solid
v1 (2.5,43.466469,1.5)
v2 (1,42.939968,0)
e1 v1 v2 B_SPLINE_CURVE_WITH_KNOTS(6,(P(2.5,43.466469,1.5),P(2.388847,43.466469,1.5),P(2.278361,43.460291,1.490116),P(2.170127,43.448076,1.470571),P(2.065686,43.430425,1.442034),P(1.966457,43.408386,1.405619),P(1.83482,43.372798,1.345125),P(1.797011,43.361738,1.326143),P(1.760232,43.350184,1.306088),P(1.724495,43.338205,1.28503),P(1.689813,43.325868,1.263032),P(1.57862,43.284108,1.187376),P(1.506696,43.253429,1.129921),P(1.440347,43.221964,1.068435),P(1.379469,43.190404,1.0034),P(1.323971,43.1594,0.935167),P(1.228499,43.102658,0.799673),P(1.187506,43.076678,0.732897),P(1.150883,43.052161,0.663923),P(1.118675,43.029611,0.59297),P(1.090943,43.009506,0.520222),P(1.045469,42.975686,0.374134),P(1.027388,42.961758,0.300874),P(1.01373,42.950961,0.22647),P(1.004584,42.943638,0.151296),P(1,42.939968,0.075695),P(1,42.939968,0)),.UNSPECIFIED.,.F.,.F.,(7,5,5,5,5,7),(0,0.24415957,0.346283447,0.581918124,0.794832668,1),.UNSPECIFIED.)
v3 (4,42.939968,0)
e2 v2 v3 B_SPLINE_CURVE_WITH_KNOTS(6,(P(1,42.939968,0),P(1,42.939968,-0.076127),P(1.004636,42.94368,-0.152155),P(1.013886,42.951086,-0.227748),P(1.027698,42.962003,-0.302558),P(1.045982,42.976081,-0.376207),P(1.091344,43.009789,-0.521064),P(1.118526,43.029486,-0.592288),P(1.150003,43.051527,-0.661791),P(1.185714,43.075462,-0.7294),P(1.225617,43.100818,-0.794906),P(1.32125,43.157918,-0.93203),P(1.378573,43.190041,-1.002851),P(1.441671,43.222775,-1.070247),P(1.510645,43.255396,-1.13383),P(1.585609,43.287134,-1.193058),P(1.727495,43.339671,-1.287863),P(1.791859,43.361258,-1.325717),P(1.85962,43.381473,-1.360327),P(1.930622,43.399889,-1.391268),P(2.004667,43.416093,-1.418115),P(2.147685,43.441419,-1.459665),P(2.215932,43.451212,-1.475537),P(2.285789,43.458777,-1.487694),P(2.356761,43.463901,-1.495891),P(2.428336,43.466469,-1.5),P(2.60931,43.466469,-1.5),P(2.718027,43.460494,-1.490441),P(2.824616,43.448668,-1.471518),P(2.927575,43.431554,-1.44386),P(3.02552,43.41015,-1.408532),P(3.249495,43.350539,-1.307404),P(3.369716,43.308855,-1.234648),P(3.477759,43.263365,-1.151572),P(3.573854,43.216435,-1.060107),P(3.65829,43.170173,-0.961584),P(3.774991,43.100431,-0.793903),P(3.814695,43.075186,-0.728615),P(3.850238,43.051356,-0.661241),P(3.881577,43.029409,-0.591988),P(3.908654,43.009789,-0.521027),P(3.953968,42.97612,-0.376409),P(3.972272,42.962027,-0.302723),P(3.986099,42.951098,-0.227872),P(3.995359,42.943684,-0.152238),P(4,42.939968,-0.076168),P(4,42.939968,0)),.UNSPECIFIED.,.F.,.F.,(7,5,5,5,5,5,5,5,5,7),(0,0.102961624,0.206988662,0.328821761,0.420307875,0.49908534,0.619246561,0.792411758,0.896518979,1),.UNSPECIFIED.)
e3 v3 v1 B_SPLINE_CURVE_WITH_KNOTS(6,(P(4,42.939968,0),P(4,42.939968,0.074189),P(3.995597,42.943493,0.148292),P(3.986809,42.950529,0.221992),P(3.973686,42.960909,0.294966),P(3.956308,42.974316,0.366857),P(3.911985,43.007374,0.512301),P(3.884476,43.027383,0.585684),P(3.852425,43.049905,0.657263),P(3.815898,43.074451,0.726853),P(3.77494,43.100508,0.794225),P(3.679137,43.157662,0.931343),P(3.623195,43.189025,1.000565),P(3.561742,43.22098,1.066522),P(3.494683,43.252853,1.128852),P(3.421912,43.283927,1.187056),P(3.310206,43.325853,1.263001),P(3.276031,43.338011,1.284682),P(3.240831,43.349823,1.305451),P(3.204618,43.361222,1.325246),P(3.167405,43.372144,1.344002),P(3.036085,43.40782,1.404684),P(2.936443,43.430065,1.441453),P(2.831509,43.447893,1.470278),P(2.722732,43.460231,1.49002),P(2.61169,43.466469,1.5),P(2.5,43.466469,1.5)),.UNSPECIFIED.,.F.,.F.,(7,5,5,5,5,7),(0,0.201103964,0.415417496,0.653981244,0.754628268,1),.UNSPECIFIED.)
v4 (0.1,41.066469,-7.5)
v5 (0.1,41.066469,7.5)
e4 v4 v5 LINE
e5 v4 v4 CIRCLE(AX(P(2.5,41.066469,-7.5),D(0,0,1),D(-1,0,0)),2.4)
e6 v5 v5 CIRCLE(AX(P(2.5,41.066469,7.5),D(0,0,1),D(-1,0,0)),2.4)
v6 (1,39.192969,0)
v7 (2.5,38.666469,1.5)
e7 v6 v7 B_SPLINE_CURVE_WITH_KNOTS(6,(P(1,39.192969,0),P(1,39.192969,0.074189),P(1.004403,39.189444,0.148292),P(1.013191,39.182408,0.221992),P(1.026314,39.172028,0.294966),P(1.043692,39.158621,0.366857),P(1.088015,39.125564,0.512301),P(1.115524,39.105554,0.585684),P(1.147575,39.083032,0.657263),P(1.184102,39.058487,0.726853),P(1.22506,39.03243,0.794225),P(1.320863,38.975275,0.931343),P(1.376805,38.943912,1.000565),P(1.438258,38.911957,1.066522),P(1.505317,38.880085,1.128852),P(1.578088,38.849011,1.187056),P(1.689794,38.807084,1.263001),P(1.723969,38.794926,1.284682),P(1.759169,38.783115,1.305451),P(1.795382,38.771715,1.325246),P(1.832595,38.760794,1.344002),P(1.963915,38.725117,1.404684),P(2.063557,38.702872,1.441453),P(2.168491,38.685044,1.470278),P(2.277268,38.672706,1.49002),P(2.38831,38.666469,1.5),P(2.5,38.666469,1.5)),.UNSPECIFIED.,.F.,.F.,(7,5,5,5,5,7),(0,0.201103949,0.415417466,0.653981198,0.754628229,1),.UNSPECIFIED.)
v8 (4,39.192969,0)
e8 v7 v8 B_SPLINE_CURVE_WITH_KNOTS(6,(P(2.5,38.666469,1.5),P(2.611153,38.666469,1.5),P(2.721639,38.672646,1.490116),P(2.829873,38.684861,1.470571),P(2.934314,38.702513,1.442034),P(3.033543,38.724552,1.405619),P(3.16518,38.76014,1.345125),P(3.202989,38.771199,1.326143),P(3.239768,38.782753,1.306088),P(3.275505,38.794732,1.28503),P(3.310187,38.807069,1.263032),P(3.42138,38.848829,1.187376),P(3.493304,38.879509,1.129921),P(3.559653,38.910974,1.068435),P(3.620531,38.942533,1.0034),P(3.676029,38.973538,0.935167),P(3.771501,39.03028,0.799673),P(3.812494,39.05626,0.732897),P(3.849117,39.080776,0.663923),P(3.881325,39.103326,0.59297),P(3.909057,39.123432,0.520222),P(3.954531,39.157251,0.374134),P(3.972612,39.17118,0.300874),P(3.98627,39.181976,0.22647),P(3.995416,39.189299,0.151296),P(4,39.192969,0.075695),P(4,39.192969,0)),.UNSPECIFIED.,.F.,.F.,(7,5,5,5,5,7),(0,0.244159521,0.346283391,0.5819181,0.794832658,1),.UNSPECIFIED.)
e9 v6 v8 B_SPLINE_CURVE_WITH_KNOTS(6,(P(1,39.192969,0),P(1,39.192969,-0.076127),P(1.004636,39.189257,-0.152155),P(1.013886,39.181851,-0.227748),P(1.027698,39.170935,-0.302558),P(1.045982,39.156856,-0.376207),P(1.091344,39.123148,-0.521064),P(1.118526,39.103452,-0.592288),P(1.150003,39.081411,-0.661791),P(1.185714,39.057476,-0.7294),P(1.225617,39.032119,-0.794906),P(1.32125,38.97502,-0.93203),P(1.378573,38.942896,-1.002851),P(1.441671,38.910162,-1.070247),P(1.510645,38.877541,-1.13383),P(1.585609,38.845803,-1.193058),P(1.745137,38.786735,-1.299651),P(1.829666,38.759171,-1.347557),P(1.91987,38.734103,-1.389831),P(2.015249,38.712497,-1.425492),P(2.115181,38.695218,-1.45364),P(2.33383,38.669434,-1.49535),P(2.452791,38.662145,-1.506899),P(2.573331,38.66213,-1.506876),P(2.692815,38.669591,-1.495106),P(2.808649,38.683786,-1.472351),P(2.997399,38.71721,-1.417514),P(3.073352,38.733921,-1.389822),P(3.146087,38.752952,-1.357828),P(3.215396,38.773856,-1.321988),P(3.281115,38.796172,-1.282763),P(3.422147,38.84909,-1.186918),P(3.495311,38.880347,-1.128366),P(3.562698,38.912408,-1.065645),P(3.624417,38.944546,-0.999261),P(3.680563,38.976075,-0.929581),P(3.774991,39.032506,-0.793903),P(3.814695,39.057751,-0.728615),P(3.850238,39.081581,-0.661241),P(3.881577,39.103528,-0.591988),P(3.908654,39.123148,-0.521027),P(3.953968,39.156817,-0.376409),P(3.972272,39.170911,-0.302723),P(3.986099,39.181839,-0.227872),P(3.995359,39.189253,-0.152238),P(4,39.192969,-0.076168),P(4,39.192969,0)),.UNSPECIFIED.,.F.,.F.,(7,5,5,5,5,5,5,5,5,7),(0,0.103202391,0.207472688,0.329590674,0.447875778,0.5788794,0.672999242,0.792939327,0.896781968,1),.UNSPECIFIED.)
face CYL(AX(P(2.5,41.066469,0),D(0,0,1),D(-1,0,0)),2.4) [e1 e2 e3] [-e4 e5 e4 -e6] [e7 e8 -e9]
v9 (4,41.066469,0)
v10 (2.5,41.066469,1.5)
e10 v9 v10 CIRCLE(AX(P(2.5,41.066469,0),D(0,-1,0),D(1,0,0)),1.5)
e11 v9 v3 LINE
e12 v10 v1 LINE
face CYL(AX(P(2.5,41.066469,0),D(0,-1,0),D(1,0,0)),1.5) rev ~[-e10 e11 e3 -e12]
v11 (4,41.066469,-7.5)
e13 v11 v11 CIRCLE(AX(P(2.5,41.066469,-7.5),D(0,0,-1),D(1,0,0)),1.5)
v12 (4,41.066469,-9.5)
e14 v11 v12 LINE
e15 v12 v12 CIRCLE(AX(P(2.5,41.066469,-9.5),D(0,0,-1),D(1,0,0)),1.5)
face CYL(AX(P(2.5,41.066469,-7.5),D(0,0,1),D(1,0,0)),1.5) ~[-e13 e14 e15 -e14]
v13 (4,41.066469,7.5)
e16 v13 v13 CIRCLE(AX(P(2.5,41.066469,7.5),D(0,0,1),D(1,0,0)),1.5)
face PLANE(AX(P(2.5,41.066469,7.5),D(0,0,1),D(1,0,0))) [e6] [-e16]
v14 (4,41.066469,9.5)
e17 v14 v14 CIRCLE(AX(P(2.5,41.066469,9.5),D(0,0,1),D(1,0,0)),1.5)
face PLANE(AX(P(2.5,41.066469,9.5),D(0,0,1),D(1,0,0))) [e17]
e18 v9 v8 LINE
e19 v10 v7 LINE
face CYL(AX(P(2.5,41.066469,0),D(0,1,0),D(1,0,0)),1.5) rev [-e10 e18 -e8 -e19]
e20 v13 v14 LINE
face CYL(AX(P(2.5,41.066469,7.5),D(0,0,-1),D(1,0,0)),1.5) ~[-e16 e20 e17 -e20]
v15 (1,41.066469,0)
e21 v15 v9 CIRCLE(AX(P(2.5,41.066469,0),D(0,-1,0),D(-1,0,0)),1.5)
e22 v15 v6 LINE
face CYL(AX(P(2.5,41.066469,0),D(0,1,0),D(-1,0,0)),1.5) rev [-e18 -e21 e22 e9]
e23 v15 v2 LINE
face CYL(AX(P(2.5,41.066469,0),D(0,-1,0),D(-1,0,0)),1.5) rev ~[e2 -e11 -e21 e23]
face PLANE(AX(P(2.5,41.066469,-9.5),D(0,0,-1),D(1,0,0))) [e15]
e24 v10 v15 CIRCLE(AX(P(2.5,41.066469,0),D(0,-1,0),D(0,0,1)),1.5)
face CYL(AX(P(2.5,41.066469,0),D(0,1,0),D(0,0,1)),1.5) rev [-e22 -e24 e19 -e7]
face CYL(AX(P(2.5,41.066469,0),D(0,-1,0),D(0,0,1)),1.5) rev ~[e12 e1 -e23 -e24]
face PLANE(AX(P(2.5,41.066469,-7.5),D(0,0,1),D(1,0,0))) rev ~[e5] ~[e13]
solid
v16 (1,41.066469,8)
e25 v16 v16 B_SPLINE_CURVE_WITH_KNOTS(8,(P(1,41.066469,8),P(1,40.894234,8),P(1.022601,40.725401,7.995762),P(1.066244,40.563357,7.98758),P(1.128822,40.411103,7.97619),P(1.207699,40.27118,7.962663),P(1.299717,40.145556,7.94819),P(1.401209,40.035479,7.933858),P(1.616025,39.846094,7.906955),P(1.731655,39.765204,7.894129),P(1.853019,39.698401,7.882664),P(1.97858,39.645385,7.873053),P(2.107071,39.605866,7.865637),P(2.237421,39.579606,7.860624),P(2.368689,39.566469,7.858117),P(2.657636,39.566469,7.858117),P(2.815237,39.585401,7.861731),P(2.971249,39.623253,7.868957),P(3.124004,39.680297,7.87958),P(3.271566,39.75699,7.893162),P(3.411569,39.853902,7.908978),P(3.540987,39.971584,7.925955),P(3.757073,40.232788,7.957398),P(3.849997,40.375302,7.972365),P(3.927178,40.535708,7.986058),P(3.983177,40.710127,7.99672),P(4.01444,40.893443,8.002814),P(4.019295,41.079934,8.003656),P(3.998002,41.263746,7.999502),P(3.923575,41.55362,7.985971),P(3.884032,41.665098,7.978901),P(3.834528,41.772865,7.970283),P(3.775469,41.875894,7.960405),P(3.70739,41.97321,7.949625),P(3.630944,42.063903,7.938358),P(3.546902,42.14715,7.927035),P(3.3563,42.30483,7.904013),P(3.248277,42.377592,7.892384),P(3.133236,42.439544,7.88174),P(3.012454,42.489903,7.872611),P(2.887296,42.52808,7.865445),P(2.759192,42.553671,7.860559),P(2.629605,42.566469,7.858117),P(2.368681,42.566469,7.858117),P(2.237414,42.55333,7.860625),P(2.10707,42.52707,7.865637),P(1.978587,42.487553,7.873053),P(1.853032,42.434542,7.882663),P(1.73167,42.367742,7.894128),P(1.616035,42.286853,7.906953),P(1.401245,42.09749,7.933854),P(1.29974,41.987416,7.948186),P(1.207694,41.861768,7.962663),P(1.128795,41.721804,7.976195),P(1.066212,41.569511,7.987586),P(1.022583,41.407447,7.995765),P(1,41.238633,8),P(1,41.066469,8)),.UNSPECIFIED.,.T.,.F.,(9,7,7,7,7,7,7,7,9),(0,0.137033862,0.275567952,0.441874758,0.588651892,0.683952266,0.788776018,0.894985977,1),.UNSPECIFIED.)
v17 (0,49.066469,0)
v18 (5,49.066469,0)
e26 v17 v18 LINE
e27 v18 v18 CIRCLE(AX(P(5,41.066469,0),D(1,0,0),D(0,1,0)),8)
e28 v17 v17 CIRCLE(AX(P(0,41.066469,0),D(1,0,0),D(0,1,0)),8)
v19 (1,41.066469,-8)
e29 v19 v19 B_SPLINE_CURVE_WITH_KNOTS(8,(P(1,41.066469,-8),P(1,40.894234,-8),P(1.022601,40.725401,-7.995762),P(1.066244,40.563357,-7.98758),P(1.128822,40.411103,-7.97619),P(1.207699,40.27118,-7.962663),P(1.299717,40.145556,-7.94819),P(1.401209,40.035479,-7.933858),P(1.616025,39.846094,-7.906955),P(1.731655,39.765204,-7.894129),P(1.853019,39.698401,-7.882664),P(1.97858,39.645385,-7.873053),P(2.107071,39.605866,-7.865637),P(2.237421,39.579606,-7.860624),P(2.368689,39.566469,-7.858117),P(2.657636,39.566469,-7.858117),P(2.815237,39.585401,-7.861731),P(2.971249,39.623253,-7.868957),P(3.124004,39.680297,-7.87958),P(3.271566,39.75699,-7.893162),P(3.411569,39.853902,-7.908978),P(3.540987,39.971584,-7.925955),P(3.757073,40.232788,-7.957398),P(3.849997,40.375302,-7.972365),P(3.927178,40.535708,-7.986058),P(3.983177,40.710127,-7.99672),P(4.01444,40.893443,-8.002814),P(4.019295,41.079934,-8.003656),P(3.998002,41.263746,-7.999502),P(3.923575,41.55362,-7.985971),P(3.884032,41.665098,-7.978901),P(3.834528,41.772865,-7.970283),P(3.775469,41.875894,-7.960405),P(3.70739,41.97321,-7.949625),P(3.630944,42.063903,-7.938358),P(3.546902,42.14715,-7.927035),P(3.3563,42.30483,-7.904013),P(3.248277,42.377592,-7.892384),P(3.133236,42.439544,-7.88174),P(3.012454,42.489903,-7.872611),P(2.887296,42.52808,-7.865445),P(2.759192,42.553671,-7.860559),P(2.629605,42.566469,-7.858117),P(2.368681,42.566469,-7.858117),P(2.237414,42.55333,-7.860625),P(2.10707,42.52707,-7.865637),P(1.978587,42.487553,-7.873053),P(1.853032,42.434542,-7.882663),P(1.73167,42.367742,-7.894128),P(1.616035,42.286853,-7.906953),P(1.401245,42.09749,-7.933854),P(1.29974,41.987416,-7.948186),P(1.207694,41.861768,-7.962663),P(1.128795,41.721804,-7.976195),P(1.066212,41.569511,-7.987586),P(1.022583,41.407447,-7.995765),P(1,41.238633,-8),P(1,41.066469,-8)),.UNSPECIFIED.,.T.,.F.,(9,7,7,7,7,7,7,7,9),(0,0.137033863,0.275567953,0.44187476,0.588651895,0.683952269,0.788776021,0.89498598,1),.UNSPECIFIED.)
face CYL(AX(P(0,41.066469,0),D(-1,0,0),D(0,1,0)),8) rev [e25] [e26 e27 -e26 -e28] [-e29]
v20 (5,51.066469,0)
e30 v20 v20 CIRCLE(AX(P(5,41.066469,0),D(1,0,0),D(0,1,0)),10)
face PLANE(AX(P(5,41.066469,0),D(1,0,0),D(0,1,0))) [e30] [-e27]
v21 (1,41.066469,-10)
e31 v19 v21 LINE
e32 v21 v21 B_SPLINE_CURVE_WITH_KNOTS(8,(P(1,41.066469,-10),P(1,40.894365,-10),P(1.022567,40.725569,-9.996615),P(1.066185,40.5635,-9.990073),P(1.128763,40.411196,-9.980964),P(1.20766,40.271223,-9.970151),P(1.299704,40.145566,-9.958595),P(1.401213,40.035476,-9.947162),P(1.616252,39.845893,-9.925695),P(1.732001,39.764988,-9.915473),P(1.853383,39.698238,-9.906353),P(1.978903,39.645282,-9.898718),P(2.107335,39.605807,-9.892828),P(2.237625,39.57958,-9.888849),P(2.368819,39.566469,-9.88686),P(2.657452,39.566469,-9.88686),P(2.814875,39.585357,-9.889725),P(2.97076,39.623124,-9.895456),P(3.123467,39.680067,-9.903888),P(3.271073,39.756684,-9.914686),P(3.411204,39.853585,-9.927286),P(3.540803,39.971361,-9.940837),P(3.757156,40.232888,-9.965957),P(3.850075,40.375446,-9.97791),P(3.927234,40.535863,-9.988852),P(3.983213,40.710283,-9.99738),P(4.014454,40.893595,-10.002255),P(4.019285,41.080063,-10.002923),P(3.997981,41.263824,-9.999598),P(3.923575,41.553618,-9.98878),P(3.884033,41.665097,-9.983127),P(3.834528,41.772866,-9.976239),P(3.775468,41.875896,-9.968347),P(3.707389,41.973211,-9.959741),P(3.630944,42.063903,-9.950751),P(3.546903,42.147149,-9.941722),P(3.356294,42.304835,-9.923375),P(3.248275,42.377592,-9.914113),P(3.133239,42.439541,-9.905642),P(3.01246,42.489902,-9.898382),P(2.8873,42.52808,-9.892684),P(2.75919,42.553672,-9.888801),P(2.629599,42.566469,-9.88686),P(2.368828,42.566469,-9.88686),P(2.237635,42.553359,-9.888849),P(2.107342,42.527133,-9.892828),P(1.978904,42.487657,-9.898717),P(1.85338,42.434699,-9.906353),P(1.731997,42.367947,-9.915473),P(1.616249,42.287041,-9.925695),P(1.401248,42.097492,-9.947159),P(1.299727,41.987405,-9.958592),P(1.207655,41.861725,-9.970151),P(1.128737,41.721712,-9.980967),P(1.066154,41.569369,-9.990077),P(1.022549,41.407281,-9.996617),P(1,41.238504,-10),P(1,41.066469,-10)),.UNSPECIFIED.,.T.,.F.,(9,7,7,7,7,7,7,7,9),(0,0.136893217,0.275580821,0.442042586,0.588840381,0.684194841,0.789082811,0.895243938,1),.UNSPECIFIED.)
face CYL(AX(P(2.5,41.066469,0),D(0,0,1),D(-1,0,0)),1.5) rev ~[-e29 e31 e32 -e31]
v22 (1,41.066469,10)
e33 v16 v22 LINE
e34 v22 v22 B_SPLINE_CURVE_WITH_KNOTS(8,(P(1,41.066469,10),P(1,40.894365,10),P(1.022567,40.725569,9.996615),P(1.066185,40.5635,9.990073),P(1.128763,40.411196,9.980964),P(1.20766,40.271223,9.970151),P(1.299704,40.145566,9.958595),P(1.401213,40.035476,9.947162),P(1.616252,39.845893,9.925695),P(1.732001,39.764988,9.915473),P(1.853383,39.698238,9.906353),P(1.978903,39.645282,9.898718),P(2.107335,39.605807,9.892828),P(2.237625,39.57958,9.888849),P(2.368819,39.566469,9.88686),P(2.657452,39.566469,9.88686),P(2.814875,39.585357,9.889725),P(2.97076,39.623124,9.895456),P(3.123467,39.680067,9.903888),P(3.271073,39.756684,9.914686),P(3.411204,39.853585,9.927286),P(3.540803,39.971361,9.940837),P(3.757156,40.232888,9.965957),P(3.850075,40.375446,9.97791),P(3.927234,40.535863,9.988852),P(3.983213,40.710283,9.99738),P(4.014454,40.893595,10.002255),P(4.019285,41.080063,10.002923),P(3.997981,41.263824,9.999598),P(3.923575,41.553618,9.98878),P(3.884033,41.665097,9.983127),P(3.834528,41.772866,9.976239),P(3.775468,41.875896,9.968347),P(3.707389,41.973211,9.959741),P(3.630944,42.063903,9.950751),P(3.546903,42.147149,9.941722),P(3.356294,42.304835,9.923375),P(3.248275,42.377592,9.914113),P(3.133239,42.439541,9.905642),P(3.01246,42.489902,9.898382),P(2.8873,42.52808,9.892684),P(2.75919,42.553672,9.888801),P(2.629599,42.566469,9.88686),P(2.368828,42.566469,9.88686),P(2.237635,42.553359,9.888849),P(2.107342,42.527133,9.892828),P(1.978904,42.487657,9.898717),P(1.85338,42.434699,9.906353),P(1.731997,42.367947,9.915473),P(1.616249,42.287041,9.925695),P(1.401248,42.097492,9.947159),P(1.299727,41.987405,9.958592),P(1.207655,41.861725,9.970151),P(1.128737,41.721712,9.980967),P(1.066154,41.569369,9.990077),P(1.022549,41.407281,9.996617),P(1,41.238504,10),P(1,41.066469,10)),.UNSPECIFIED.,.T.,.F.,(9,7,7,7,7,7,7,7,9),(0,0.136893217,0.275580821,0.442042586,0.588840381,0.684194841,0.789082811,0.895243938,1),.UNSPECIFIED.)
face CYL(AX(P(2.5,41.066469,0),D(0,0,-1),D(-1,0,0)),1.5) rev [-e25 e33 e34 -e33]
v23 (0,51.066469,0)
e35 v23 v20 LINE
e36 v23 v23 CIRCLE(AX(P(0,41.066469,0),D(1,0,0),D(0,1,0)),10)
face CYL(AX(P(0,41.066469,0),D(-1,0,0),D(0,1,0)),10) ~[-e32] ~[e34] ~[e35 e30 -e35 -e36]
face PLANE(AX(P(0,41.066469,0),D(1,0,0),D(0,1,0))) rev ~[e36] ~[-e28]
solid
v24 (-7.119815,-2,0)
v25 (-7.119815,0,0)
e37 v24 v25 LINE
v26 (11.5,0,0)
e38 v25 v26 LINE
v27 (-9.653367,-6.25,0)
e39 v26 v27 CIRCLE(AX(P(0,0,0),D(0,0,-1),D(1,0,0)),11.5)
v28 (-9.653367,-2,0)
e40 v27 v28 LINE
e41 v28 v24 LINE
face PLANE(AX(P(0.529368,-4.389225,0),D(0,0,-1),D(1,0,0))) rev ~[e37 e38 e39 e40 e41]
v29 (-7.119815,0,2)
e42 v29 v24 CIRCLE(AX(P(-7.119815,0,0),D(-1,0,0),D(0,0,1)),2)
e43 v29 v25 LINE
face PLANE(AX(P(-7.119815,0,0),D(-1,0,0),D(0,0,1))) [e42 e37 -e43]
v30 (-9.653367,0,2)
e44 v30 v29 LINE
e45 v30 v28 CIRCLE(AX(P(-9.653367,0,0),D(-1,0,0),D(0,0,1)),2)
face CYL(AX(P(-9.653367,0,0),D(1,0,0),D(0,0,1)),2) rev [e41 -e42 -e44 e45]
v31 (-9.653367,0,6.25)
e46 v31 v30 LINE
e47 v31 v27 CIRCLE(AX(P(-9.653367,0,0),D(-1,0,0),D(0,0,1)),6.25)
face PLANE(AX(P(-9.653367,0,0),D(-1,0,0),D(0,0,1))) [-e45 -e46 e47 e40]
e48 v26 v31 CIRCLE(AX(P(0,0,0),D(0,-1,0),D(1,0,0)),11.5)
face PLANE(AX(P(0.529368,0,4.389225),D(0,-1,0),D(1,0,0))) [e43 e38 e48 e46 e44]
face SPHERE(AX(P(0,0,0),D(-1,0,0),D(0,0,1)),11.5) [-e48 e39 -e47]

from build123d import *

# Parameters (mm, degrees)
F4_ANGLE       = 270
F5_R           = 10
F5_R_2         = 8
F6_DEPTH       = 5
F8_DEPTH       = 11
F8_DEPTH_BACK  = 25
F11_DEPTH      = 7.5
F11_DEPTH_BACK = 7.5
F12_DEPTH      = 4
F12_DEPTH_BACK = 4
F13_R          = 1.5
F14_DEPTH      = 2
F15_R          = 1.5
F16_DEPTH      = 2


# Not quite as in the source:
# - the program builds the solid bodies; features that only make, move or delete a surface that nothing else refers to are left out


with BuildPart() as f4:
    # F3 (on Front) → F4 (revolve)
    with BuildSketch(Plane.XZ):
        with BuildLine():
            Line((-7.119815331, 0), (11.5, 0))
            ThreePointArc((11.5, 0), (3.2585484641, 11.0286835981), (-9.6533672882, 6.25))
            Line((-9.6533672882, 6.25), (-9.6533672882, 2))
            Line((-9.6533672882, 2), (-7.119815331, 2))
            Line((-7.119815331, 2), (-7.119815331, 0))
        make_face()
    revolve(axis=Axis((-0.0106887892, 0, 0), (-1, 0, 0)), revolution_arc=F4_ANGLE)


with BuildPart() as f6:
    # F5 (on Right) → F6 (new body)
    with BuildSketch(Plane.YZ):
        with Locations((41.0664686725, 0)):
            Circle(F5_R)
        with Locations((41.0664686725, 0)):
            Circle(F5_R_2, mode=Mode.SUBTRACT)
    extrude(amount=F6_DEPTH)

    # F7 (on Top) → F8 (cut, two sides)
    with BuildSketch(Plane.XY) as f8_sk:
        with BuildLine():
            ThreePointArc((4, 41.0664686725), (2.5, 42.5664686725), (1, 41.0664686725))
            ThreePointArc((1, 41.0664686725), (2.5, 39.5664686725), (4, 41.0664686725))
        make_face()
    extrude(amount=-F8_DEPTH, mode=Mode.SUBTRACT)
    extrude(f8_sk.sketch, amount=F8_DEPTH_BACK, mode=Mode.SUBTRACT)


with BuildPart() as f11:
    # F7 (on Top) → F11 (new body, two sides)
    with BuildSketch(Plane.XY) as f11_sk:
        with BuildLine():
            ThreePointArc((4.9, 41.0664686725), (2.5, 43.4664686725), (0.1, 41.0664686725))
            ThreePointArc((0.1, 41.0664686725), (2.5, 38.6664686725), (4.9, 41.0664686725))
        make_face()
        with BuildLine():
            ThreePointArc((4, 41.0664686725), (2.5, 39.5664686725), (1, 41.0664686725))
            ThreePointArc((1, 41.0664686725), (2.5, 42.5664686725), (4, 41.0664686725))
        make_face(mode=Mode.SUBTRACT)
        with BuildLine():
            ThreePointArc((4, 41.0664686725), (2.5, 42.5664686725), (1, 41.0664686725))
            ThreePointArc((1, 41.0664686725), (2.5, 39.5664686725), (4, 41.0664686725))
        make_face()
    extrude(amount=F11_DEPTH)
    extrude(f11_sk.sketch, amount=-F11_DEPTH_BACK)

    # F10 (on face) → F12 (cut, two sides)
    with BuildSketch(Plane.XZ.offset(-41.0664686725)) as f12_sk:
        with BuildLine():
            ThreePointArc((1, 0), (2.5, -1.5), (4, 0))
            ThreePointArc((4, 0), (3.5606601718, 1.0606601718), (2.5, 1.5))
            Line((2.5, 1.5), (2.5, 0))
            Line((2.5, 0), (1, 0))
        make_face()
        with BuildLine():
            Line((2.5, 0), (2.5, 1.5))
            ThreePointArc((2.5, 1.5), (1.4393398282, 1.0606601718), (1, 0))
            Line((1, 0), (2.5, 0))
        make_face()
    extrude(amount=-F12_DEPTH, mode=Mode.SUBTRACT)
    extrude(f12_sk.sketch, amount=F12_DEPTH_BACK, mode=Mode.SUBTRACT)

    # F13 (on face) → F14 (join)
    with BuildSketch(Plane.XY.offset(7.5)):
        with Locations((2.5, 41.0664686725)):
            Circle(F13_R)
    extrude(amount=F14_DEPTH)

    # F15 (on face) → F16 (join)
    with BuildSketch(Plane(origin=(0, 0, -7.5), x_dir=(1, 0, 0), z_dir=(0, 0, -1))):
        with Locations((2.5, -41.0664686725)):
            Circle(F15_R)
    extrude(amount=F16_DEPTH)


solid = Compound([f4.part, f6.part, f11.part])
